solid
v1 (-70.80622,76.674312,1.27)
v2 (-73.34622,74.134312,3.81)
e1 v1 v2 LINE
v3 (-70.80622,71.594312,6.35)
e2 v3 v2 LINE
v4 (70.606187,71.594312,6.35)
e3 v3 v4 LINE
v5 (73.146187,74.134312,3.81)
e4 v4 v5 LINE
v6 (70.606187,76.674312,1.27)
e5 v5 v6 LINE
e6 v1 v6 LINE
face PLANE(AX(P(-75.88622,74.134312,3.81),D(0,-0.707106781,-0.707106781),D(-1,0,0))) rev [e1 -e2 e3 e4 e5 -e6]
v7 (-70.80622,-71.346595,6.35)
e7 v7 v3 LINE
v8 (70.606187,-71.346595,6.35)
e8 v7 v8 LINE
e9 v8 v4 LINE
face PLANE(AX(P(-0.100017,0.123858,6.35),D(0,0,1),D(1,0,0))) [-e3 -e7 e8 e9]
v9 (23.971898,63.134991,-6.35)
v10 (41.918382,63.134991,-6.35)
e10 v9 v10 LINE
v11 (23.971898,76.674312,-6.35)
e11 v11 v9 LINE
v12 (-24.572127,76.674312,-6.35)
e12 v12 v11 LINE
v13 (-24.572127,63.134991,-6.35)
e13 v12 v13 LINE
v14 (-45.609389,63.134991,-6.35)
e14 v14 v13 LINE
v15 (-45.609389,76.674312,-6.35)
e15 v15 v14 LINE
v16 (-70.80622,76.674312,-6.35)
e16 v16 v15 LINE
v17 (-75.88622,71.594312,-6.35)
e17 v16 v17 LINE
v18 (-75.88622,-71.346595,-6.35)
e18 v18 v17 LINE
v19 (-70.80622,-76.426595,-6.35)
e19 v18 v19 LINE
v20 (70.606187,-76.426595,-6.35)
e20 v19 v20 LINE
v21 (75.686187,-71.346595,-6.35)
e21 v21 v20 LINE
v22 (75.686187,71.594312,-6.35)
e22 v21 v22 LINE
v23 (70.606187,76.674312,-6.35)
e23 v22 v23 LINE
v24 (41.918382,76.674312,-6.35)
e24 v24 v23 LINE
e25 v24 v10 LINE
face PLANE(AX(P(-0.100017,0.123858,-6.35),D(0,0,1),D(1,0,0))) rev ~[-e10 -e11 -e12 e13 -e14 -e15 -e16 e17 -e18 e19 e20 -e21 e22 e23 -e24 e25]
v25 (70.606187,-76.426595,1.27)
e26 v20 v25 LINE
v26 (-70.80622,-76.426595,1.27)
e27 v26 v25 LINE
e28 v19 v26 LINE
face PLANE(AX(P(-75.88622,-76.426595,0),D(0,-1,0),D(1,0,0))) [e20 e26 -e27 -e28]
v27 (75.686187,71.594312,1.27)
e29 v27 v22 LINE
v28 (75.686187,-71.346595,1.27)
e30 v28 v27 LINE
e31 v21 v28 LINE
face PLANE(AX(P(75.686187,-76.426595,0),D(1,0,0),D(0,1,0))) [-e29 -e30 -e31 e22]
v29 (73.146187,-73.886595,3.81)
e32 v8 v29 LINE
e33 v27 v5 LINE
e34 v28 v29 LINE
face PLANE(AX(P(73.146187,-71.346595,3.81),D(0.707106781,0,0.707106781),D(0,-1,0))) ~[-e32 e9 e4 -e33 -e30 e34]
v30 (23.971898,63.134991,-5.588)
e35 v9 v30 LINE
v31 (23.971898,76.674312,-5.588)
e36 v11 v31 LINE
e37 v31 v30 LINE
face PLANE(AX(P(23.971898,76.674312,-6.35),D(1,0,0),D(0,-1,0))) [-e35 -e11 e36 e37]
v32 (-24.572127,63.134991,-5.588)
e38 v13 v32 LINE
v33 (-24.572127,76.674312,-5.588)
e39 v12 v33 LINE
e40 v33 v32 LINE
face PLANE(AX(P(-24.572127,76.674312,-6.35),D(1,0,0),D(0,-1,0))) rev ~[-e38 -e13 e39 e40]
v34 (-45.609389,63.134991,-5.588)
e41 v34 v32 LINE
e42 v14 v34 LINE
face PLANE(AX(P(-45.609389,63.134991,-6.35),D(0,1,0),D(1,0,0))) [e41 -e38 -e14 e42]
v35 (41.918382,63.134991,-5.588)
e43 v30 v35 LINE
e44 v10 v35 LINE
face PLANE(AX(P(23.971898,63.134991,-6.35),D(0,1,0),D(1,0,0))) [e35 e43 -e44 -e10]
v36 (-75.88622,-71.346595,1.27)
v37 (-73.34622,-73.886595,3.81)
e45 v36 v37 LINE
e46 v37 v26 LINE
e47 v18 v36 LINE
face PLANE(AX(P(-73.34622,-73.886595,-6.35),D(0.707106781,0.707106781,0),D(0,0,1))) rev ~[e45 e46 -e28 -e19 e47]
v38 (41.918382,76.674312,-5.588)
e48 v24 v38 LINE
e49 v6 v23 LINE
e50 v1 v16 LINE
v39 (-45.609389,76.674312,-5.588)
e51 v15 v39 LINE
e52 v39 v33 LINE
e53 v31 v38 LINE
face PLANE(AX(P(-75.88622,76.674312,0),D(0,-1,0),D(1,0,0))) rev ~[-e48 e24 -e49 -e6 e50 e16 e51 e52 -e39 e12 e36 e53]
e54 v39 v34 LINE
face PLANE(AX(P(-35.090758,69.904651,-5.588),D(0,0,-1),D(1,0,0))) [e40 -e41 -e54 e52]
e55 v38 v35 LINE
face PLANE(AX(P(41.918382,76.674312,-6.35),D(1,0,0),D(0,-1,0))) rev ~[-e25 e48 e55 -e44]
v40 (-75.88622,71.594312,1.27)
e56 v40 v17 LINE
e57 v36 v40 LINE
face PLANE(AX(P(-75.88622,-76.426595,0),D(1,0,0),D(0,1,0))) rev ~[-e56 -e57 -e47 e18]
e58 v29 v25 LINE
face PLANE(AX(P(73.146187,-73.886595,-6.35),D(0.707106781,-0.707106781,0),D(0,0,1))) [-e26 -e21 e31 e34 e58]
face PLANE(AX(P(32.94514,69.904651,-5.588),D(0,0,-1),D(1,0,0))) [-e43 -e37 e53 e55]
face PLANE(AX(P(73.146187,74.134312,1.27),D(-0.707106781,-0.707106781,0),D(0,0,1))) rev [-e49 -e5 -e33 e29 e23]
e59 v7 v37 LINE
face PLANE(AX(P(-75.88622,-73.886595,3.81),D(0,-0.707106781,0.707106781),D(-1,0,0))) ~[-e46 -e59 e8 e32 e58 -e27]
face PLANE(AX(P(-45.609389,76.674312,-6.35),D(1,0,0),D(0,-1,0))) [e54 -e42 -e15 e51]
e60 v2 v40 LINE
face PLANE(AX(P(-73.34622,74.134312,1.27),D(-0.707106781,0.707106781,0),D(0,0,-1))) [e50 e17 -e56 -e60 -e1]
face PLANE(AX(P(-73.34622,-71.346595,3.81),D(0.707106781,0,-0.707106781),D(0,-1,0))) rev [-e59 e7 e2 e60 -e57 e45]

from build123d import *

# Parameters (mm, degrees)
F0_W     = 151.572406292
F0_H     = 153.1009078026
F1_DEPTH = 6.35
F2_SIZE  = 5.08
F3_SIZE  = 5.08
F4_SIZE  = 5.08
F5_SIZE  = 5.08
F6_W     = 17.9464835674
F6_H     = 13.5393217206
F7_DEPTH = 0.762
F8_W     = 21.0372619331
F8_H     = 13.5393217206
F9_DEPTH = 0.762
F10_SIZE = 5.08
F11_SIZE = 5.08
F12_SIZE = 5.08
F13_SIZE = 5.08


with BuildPart() as f1:
    # F0 (on Top) → F1 (new body, symmetric)
    with BuildSketch(Plane.XY):
        with Locations((-0.1000165939, 0.1238584518)):
            Rectangle(F0_W, F0_H)
    extrude(amount=F1_DEPTH, both=True)

    # F2
    f2_edges = [f1.edges().sort_by_distance(p)[0] for p in [
        (-0.100017, -76.426595, 6.35),
    ]]
    chamfer(f2_edges, length=F2_SIZE)

    # F3
    f3_edges = [f1.edges().sort_by_distance(p)[0] for p in [
        (-0.100017, 76.674312, 6.35),
    ]]
    chamfer(f3_edges, length=F3_SIZE)

    # F4
    f4_edges = [f1.edges().sort_by_distance(p)[0] for p in [
        (75.686187, 0.123858, 6.35),
    ]]
    chamfer(f4_edges, length=F4_SIZE)

    # F5
    f5_edges = [f1.edges().sort_by_distance(p)[0] for p in [
        (-75.88622, 0.123858, 6.35),
    ]]
    chamfer(f5_edges, length=F5_SIZE)

    # F6 (on face) → F7 (cut)
    with BuildSketch(Plane(origin=(0, 0, -6.35), x_dir=(1, 0, 0), z_dir=(0, 0, -1))):
        with Locations((32.9451402649, -69.9046514928)):
            Rectangle(F6_W, F6_H)
    extrude(amount=-F7_DEPTH, mode=Mode.SUBTRACT)

    # F8 (on face) → F9 (cut)
    with BuildSketch(Plane(origin=(0, 0, -6.35), x_dir=(1, 0, 0), z_dir=(0, 0, -1))):
        with Locations((-35.0907575339, -69.9046514928)):
            Rectangle(F8_W, F8_H)
    extrude(amount=-F9_DEPTH, mode=Mode.SUBTRACT)

    # F10
    f10_edges = [f1.edges().sort_by_distance(p)[0] for p in [
        (75.686187, -76.426595, -2.54),
    ]]
    chamfer(f10_edges, length=F10_SIZE)

    # F11
    f11_edges = [f1.edges().sort_by_distance(p)[0] for p in [
        (75.686187, 76.674312, -2.54),
    ]]
    chamfer(f11_edges, length=F11_SIZE)

    # F12
    f12_edges = [f1.edges().sort_by_distance(p)[0] for p in [
        (-75.88622, 76.674312, -2.54),
    ]]
    chamfer(f12_edges, length=F12_SIZE)

    # F13
    f13_edges = [f1.edges().sort_by_distance(p)[0] for p in [
        (-75.88622, -76.426595, -2.54),
    ]]
    chamfer(f13_edges, length=F13_SIZE)


solid = f1.part
